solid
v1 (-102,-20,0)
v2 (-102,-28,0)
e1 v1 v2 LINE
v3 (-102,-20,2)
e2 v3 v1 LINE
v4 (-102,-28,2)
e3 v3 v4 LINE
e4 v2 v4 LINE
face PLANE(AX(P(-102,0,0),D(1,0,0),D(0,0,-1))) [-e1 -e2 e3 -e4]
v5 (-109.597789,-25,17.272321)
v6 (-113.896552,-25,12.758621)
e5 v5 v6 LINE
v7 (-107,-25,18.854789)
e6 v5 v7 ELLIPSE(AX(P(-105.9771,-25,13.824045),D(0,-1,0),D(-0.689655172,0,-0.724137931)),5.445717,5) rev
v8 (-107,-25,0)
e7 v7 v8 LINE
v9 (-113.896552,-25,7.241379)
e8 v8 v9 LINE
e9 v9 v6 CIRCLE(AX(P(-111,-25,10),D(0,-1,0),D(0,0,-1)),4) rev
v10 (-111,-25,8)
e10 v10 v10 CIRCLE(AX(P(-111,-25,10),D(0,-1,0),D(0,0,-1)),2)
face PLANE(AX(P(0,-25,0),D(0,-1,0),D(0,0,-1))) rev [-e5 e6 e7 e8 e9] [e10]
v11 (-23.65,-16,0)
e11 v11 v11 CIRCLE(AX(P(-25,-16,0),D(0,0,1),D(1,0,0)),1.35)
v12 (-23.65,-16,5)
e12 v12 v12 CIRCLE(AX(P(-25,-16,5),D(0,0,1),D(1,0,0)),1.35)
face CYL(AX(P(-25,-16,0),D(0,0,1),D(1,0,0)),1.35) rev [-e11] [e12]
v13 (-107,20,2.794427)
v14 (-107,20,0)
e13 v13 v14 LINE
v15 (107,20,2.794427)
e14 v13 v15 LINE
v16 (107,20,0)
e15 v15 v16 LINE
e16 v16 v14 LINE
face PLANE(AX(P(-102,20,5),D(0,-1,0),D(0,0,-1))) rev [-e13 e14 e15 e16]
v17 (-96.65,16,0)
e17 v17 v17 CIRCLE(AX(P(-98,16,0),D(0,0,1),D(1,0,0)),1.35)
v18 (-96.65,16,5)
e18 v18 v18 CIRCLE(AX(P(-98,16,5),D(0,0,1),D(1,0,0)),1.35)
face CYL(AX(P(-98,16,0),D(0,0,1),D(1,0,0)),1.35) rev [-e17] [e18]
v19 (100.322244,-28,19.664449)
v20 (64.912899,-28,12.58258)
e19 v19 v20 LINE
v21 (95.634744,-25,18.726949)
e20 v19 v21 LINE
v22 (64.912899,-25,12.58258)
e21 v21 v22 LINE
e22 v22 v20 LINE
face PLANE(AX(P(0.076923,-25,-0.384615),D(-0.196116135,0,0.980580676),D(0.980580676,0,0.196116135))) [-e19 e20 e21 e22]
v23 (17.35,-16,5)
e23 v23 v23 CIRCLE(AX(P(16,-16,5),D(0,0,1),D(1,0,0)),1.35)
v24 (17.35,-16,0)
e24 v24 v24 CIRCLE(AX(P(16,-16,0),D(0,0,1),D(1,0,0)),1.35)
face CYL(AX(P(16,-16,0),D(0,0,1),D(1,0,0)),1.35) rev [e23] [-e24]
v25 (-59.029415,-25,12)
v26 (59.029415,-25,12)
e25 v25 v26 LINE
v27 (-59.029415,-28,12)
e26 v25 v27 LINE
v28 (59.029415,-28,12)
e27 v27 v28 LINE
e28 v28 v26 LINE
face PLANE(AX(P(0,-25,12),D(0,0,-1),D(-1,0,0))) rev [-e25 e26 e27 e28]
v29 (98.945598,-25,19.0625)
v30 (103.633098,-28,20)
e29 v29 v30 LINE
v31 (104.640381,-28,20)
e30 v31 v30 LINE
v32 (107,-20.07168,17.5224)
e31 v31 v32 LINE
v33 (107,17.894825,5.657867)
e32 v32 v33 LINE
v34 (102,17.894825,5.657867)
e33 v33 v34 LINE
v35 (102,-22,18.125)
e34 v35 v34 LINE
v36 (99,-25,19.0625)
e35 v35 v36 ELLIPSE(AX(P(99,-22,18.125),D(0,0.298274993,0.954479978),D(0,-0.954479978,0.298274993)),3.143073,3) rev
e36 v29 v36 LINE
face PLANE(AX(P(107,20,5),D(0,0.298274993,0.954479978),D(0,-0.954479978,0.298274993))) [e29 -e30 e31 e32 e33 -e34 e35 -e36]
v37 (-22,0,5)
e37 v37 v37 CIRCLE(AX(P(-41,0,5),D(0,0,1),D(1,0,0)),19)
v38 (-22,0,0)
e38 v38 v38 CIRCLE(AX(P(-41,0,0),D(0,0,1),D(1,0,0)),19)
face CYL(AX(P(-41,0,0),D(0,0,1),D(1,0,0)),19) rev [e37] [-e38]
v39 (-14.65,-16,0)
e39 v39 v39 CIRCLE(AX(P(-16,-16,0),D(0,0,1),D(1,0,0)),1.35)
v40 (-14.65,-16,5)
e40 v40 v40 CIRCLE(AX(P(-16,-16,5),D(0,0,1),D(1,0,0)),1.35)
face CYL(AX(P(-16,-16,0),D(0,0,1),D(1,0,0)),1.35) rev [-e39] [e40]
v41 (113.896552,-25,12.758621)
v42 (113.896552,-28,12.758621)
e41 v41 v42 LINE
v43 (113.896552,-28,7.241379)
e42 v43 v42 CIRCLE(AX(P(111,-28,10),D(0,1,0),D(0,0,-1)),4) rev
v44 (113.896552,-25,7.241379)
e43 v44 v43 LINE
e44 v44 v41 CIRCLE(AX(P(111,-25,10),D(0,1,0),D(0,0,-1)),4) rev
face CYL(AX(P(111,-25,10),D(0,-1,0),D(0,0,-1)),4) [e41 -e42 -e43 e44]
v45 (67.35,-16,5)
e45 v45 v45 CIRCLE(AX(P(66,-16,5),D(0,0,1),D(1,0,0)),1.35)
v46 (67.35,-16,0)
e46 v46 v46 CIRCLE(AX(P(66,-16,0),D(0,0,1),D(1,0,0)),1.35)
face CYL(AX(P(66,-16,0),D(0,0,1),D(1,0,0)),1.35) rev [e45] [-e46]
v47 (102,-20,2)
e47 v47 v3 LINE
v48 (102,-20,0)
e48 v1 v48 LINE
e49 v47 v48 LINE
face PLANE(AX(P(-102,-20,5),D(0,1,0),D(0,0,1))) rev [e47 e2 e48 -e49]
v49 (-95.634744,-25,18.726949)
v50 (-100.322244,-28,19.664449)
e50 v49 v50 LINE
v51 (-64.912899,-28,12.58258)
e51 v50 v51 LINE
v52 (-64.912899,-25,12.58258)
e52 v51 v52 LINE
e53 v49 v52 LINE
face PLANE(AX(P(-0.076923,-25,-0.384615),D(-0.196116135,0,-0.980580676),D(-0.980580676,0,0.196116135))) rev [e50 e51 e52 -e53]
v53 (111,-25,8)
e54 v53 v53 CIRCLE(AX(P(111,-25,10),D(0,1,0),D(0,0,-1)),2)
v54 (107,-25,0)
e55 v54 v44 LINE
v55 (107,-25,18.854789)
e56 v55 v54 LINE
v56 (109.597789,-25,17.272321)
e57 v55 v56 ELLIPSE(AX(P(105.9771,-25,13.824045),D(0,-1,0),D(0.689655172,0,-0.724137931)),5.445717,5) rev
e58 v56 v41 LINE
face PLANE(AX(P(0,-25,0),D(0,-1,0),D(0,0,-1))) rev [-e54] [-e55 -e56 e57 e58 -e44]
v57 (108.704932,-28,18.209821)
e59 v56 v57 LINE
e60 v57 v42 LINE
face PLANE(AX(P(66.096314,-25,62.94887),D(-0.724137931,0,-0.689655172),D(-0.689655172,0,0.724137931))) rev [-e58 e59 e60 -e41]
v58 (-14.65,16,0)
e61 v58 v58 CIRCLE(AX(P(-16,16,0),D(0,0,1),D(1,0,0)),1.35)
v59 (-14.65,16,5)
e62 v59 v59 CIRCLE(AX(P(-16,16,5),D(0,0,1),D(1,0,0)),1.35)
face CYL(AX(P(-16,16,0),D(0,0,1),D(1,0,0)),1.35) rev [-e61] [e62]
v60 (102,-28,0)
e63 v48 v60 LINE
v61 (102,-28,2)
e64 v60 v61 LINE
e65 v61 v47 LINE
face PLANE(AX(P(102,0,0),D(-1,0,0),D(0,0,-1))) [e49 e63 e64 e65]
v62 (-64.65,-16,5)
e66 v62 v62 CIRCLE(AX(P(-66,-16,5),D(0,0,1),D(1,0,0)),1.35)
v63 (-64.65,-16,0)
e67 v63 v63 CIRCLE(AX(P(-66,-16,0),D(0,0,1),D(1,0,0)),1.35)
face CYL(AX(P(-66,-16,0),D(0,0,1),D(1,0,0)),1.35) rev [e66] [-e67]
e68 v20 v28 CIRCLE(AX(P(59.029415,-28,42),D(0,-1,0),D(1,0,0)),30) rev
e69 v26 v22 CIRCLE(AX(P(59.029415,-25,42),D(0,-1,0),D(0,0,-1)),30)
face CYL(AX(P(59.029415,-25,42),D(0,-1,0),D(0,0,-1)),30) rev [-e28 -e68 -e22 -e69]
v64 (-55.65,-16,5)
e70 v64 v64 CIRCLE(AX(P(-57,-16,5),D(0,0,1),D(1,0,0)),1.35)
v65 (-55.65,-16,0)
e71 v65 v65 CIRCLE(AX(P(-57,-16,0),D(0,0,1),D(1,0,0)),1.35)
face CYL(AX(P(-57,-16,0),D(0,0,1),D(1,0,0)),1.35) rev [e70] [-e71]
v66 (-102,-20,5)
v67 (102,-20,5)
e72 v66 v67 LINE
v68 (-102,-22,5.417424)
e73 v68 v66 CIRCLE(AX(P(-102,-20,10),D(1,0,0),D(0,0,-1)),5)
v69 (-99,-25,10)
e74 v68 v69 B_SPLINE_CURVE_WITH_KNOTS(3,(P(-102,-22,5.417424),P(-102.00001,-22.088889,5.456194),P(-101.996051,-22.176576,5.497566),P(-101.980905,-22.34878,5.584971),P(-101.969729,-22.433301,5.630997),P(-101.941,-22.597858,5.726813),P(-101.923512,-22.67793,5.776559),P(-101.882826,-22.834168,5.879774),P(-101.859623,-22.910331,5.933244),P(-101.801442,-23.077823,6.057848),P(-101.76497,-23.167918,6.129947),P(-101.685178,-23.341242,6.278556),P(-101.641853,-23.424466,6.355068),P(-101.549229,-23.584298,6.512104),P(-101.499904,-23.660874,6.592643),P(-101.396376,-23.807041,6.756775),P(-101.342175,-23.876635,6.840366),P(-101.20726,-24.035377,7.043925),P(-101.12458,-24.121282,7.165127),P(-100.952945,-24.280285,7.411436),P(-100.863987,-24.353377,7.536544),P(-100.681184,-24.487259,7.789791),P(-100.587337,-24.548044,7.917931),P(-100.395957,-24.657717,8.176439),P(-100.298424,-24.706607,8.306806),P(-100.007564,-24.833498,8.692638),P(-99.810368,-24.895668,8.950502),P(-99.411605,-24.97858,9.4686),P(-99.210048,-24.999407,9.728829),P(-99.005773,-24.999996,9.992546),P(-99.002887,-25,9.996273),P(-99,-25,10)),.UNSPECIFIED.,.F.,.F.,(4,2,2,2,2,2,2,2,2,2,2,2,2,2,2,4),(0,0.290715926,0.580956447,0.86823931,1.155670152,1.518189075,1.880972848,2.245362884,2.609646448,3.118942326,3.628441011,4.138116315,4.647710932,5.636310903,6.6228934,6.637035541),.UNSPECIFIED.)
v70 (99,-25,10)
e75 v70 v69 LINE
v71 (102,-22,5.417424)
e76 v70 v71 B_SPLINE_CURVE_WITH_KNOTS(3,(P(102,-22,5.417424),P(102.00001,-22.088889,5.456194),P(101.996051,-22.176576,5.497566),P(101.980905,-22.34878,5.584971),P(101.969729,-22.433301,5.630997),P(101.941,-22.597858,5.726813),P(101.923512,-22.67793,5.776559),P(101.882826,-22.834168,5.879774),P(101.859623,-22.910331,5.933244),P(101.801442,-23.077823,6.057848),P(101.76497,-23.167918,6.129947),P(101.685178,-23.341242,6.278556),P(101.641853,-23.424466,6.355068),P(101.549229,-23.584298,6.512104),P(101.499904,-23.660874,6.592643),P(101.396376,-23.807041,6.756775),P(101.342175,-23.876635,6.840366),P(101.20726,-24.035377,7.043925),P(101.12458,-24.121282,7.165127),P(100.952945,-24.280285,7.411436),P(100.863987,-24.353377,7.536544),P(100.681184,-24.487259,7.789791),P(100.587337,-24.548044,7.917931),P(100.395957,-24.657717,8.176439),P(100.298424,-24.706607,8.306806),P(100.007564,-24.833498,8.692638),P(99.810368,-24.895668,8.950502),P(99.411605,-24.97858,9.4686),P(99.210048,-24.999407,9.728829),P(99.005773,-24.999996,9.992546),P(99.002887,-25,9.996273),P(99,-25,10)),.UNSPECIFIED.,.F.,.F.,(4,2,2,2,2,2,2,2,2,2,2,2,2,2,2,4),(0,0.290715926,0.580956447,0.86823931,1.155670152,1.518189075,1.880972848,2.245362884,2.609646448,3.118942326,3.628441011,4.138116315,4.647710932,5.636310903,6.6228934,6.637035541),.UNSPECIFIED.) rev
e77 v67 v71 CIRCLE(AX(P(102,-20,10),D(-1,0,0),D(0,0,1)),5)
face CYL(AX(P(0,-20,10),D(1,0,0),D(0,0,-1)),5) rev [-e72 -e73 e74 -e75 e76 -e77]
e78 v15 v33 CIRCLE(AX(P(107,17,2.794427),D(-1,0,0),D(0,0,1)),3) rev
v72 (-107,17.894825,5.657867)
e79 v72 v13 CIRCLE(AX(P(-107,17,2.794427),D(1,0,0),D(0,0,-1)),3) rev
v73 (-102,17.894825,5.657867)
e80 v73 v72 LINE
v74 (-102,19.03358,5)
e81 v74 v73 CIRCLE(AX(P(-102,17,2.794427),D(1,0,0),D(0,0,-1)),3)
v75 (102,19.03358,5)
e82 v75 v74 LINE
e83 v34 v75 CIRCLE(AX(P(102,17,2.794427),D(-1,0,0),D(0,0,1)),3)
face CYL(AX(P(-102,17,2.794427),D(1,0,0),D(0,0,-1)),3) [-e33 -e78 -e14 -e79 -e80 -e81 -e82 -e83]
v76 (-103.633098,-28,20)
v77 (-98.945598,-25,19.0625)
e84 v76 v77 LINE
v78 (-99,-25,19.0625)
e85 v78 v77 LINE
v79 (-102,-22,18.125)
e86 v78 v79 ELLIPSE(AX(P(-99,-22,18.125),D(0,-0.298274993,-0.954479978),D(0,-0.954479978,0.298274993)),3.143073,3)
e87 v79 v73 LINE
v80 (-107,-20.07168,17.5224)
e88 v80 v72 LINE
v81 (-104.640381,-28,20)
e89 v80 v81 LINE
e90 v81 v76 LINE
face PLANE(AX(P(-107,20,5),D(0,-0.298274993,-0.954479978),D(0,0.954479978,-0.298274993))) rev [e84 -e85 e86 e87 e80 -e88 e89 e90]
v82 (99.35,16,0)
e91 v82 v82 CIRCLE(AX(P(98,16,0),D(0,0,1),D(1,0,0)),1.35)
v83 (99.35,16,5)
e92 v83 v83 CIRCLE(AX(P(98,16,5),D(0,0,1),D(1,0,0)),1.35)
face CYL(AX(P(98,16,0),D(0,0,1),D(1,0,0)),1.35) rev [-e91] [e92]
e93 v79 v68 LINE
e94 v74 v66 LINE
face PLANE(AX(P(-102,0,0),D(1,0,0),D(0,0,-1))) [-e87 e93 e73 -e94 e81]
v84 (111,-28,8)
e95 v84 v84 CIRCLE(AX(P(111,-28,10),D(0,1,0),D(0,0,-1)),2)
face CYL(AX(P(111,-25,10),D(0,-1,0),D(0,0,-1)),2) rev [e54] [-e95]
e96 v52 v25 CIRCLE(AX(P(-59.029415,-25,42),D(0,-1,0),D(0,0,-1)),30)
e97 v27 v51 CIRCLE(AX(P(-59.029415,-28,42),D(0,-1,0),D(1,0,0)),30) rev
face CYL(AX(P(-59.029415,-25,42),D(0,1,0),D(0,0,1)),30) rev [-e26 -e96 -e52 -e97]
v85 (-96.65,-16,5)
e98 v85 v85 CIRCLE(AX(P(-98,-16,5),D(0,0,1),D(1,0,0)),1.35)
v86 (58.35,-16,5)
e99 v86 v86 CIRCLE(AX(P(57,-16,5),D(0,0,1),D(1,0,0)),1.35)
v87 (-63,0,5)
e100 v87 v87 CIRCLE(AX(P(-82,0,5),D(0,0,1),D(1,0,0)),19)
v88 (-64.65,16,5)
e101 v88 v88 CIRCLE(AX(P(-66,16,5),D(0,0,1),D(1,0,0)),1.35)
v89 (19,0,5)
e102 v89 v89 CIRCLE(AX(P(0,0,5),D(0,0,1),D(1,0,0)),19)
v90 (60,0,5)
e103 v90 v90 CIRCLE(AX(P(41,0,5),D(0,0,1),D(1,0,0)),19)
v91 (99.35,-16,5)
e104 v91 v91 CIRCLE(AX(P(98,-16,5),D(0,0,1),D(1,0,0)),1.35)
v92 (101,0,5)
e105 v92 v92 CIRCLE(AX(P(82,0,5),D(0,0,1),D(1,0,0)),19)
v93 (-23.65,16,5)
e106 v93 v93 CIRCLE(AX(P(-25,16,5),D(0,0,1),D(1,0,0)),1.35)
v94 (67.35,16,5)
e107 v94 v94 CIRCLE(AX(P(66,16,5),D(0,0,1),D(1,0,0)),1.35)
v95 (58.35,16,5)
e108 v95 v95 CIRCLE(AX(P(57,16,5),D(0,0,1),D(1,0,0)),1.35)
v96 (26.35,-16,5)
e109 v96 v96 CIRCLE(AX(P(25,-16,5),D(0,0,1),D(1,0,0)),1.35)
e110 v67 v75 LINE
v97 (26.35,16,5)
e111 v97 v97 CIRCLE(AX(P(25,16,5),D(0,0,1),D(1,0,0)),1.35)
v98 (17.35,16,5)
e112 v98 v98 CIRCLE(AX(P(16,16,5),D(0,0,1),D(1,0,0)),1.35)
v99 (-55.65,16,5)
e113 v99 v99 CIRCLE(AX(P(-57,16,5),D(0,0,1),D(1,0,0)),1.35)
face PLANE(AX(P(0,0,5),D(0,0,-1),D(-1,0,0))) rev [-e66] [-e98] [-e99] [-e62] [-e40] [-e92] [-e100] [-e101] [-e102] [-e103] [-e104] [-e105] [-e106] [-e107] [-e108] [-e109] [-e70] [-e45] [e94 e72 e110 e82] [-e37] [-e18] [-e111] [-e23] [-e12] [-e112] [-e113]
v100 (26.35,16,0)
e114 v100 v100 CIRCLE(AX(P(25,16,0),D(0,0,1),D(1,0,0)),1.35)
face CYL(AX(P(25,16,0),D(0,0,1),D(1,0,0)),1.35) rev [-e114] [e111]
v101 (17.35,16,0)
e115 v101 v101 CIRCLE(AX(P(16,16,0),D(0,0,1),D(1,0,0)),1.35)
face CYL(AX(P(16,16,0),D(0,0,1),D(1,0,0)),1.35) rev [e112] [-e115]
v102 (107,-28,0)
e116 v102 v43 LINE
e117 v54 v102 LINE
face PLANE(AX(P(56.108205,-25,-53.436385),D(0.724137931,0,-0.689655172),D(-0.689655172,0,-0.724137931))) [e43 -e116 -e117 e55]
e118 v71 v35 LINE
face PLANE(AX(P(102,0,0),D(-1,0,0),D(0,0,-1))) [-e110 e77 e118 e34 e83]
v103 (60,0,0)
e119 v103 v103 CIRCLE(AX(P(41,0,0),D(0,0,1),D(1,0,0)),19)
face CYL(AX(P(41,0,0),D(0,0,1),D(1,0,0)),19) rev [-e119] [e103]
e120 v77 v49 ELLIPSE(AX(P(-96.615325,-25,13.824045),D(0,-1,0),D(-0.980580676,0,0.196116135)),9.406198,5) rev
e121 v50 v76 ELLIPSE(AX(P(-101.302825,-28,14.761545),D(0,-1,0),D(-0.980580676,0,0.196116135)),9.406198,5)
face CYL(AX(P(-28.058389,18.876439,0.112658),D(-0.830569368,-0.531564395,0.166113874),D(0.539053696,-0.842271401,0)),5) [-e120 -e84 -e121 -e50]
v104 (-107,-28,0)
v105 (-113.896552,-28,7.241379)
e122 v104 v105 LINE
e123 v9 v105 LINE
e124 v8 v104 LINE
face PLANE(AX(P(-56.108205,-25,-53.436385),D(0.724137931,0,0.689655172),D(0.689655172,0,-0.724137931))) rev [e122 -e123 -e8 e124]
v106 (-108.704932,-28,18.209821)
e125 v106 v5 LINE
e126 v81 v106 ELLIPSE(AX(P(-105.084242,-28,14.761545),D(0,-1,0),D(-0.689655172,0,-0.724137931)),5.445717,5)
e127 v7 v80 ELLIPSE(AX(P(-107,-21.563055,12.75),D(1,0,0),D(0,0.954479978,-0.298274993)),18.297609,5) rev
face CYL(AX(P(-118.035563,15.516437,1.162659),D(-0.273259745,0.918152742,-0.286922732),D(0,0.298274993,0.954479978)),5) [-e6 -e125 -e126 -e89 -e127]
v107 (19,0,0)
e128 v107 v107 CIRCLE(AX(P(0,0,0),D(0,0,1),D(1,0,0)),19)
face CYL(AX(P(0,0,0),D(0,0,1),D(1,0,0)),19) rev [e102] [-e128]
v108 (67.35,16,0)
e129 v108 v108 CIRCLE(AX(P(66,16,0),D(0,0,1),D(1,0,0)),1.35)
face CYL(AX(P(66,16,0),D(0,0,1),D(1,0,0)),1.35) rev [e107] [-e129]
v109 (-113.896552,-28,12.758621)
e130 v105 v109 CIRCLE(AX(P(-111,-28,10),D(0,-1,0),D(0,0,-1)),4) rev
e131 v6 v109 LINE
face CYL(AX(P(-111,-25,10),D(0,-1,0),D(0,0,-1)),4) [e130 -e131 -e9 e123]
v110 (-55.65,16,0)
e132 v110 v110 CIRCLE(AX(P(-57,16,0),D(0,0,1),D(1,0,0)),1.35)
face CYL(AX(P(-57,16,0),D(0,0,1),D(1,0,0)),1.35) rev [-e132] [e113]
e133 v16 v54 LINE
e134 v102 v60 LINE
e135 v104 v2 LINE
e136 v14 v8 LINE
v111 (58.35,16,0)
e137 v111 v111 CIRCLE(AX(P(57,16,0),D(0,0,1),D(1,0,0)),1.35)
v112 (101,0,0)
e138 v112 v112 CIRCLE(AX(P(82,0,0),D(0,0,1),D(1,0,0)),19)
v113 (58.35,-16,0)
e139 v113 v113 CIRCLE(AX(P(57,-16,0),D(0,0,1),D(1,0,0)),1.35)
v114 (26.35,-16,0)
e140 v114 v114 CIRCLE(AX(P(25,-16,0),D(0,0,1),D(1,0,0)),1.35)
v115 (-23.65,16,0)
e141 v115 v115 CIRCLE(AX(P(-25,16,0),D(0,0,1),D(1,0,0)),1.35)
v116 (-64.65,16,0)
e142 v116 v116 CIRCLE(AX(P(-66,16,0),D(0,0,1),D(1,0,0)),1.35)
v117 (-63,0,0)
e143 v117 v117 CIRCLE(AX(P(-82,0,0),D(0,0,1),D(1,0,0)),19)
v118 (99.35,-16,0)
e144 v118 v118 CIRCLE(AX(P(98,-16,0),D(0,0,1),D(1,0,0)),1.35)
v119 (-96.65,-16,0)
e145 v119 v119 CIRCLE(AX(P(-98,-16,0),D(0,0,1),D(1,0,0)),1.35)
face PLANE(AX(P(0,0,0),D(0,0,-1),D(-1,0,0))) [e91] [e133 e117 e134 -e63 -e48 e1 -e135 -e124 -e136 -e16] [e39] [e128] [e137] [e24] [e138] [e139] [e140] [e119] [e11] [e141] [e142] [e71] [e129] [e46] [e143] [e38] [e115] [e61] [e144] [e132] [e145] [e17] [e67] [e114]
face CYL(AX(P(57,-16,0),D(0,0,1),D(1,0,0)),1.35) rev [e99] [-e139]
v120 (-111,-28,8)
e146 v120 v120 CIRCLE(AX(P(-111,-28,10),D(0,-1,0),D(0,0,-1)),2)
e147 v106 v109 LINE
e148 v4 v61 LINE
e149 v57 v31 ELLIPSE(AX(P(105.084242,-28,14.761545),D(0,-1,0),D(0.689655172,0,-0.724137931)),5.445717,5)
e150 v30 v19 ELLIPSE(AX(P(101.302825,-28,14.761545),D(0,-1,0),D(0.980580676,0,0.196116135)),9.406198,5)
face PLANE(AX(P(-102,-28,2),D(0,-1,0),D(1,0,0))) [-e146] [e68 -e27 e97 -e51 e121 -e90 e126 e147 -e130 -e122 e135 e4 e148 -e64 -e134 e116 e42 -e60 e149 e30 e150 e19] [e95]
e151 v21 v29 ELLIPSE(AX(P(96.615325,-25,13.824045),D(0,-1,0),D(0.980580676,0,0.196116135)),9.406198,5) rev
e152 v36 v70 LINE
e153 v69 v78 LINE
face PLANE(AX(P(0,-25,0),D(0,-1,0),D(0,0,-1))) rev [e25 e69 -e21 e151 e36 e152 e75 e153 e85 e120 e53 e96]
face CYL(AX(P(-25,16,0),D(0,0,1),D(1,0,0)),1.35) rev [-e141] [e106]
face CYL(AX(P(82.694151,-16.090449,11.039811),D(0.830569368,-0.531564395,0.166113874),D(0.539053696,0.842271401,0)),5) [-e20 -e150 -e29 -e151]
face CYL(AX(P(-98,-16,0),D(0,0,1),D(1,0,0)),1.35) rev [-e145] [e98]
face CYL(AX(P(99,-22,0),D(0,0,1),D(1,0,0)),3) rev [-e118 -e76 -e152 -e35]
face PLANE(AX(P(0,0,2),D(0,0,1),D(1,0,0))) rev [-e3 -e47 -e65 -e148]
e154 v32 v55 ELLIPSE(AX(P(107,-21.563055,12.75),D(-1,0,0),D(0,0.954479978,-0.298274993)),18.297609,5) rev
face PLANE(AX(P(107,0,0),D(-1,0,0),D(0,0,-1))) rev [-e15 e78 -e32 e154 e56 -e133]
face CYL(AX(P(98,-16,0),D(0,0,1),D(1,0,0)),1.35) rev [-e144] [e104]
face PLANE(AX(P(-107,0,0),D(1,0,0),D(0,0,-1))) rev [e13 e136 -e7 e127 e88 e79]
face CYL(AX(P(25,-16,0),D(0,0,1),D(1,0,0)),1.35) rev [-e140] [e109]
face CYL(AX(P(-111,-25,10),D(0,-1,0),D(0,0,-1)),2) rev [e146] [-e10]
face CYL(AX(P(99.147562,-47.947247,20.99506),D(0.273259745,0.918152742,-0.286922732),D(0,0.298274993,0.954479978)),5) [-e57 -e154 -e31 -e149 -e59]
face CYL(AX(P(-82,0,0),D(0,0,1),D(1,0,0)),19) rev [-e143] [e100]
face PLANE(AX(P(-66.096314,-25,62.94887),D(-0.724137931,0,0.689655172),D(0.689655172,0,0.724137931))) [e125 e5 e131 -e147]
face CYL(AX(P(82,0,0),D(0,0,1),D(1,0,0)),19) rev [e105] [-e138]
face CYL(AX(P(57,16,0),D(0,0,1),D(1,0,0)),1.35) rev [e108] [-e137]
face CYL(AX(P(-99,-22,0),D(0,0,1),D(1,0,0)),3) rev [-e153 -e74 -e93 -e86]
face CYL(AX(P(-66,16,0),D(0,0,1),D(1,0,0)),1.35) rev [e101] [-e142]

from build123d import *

# Parameters (mm, degrees)
SKETCH1_W               = 204
SKETCH1_H               = 40
BOSS_EXTRUDE1_DEPTH     = 5
SKETCH3_R               = 1.3500000000000054
SKETCH3_R_2             = 19.000000000000004
SKETCH3_R_3             = 1.349999999999999
SKETCH3_R_4             = 1.3499999999999983
SKETCH3_R_5             = 19
SKETCH3_R_6             = 1.3500000000000005
SKETCH3_R_7             = 1.3500000000000059
SKETCH3_R_8             = 1.3499999999999912
CUT_EXTRUDE1_DEPTH      = 105.06248123122955
BOSS_EXTRUDE2_DEPTH     = 3
BOSS_EXTRUDE3_DEPTH     = 5
SKETCH7_R               = 1.9999999999999962
BOSS_EXTRUDE4_DEPTH     = 3
CUT_EXTRUDE2_DEPTH      = 225.65084019428903
CUT_EXTRUDE2_DEPTH_BACK = 225.65084019428903
FILLET1_R               = 30
FILLET3_R               = 5
FILLET4_START           = 5.417424205
FILLET4_DEPTH           = 12.00765993
FILLET4_START_2         = 17.425084135
FILLET4_2_DEPTH         = 1.637415965
FILLET4_START_3         = -108
FILLET4_3_DEPTH         = 216


with BuildPart() as part:
    # Sketch1 → Boss-Extrude1 (new body)
    with BuildSketch(Plane.XY):
        Rectangle(SKETCH1_W, SKETCH1_H)
    extrude(amount=BOSS_EXTRUDE1_DEPTH)

    # Sketch3 → Cut-Extrude1 (cut, through all)
    with BuildSketch(Plane.XY.offset(5)):
        with Locations((-97.99999999999997, 15.999999999999996)):
            Circle(SKETCH3_R)
        with Locations((-66, 16.000000000000004)):
            Circle(SKETCH3_R)
        with Locations((-66, -15.999999999999977)):
            Circle(SKETCH3_R)
        with Locations((-97.99999999999997, -16.000000000000004)):
            Circle(SKETCH3_R)
        with Locations((-81.99999999999997, -3.47e-15)):
            Circle(SKETCH3_R_2)
        with Locations((-56.99999999999997, 15.999999999999996)):
            Circle(SKETCH3_R_3)
        with Locations((-25, 16.000000000000004)):
            Circle(SKETCH3_R_3)
        with Locations((-25, -15.999999999999977)):
            Circle(SKETCH3_R_4)
        with Locations((-56.99999999999997, -16.000000000000004)):
            Circle(SKETCH3_R_4)
        with Locations((-40.99999999999997, -3.47e-15)):
            Circle(SKETCH3_R_5)
        with Locations((-15.999999999999973, 15.999999999999996)):
            Circle(SKETCH3_R_3)
        with Locations((16, 16.000000000000004)):
            Circle(SKETCH3_R_3)
        with Locations((16, -15.999999999999977)):
            Circle(SKETCH3_R_4)
        with Locations((-15.999999999999973, -16.000000000000004)):
            Circle(SKETCH3_R_6)
        Circle(SKETCH3_R_2)
        with Locations((25.00000000000002, 15.999999999999996)):
            Circle(SKETCH3_R)
        with Locations((56.99999999999999, 16.000000000000004)):
            Circle(SKETCH3_R_3)
        with Locations((56.99999999999999, -15.999999999999977)):
            Circle(SKETCH3_R)
        with Locations((25.00000000000002, -16.000000000000004)):
            Circle(SKETCH3_R_7)
        with Locations((41.00000000000002, -3.47e-15)):
            Circle(SKETCH3_R_2)
        with Locations((66.00000000000003, 15.999999999999996)):
            Circle(SKETCH3_R)
        with Locations((98, 16.000000000000004)):
            Circle(SKETCH3_R_8)
        with Locations((98, -15.999999999999977)):
            Circle(SKETCH3_R)
        with Locations((66.00000000000003, -16.000000000000004)):
            Circle(SKETCH3_R)
        with Locations((82.00000000000003, -3.47e-15)):
            Circle(SKETCH3_R_2)
    extrude(amount=-CUT_EXTRUDE1_DEPTH, mode=Mode.SUBTRACT)

    # Sketch5 → Boss-Extrude2 (add)
    with BuildSketch(Plane.XY.offset(5)):
        Polygon((-101.99999999999999, -20), (102.00000000000001, -20), (102.00000000000001, -28), (-101.99999999999999, -27.999999999999996), align=None)
    extrude(amount=-BOSS_EXTRUDE2_DEPTH)

    # Sketch6 → Boss-Extrude3 (add)
    with BuildSketch(Plane.ZY.offset(101.99999999999999)):
        Polygon((0, 20), (5, 20), (20, -27.999999999999996), (0, -28), align=None)
    boss_extrude3 = extrude(amount=BOSS_EXTRUDE3_DEPTH)

    # Sketch7 → Boss-Extrude4 (add)
    # profile 1 of 2: a face of its own
    with BuildSketch(Plane.XZ.offset(27.999999999999996)):
        with BuildLine():
            ThreePointArc((-113.89655172413792, 7.241379310344828), (-114.99999999999999, 10.000000000000002), (-113.89655172413792, 12.758620689655173))
            Line((-113.89655172413792, 12.758620689655173), (-106.99999999999999, 20))
            Line((-106.99999999999999, 20), (-106.99999999999999, 0))
            Line((-106.99999999999999, 0), (-113.89655172413792, 7.241379310344828))
        make_face()
        with Locations(Location((-110.99999999999999, 10, 0), (0, 0, 270))):
            Circle(SKETCH7_R, mode=Mode.SUBTRACT)
    # profile 2 of 2: a face of its own
    with BuildSketch(Plane.XZ.offset(27.999999999999996)):
        Polygon((-61.99999999999998, 12.000000000000012), (-101.99999999999999, 20), (-101.99999999999999, 5), (0, 5.0000000000000195), (-8.6e-16, 12.00000000000001), align=None)
    boss_extrude4 = extrude(amount=-BOSS_EXTRUDE4_DEPTH)

    # Mirror1: Boss-Extrude3, Boss-Extrude4 across plane
    add(boss_extrude3.mirror(Plane(origin=(0, 0, 0), x_dir=(0, 0, 1), z_dir=(1, 0, 0))))
    add(boss_extrude4.mirror(Plane(origin=(0, 0, 0), x_dir=(0, 0, 1), z_dir=(1, 0, 0))))

    # Sketch8 → Cut-Extrude2 (cut, two sides: drawn at the far end of the back side and taken through both)
    with BuildSketch(Plane(origin=(-106.99999999999999, 0, 0), x_dir=(0, 0, -1), z_dir=(1, 0, 0)).offset(-CUT_EXTRUDE2_DEPTH_BACK)):
        Polygon((-20, -27.999999999999996), (-18.47924649389312, -23.133588780457977), (-22.698909266978262, -25.783585861034908), align=None)
    extrude(amount=CUT_EXTRUDE2_DEPTH + CUT_EXTRUDE2_DEPTH_BACK, mode=Mode.SUBTRACT)

    # Fillet1
    fillet1_edges = [part.edges().sort_by_distance(p)[0] for p in [
        (-61.99999999999998, -26.499999999999996, 12.000000000000012),
        (61.99999999999998, -26.499999999999996, 12.000000000000012),
    ]]
    fillet(fillet1_edges, radius=FILLET1_R)

    # Fillet3
    fillet3_edges = [part.edges().sort_by_distance(p)[0] for p in [
        (0, -24.999999999999996, 5),
        (99.65624999999999, -26.499999999999993, 19.53125),
        (-99.65624999999999, -26.499999999999996, 19.53125),
        (-107.44642857142854, -26.499999999999996, 19.53125),
        (107.44642857142858, -26.499999999999996, 19.531250000000004),
    ]]
    fillet(fillet3_edges, radius=FILLET3_R)

    # Fillet4: read off the stored shape, not the designer's step
    # Fillet4 outline → Fillet4 (add)
    with BuildSketch(Plane.XY.offset(FILLET4_START)):
        with BuildLine():
            ThreePointArc((-99, -25), (-101.121320344, -24.121320344), (-102, -22))
            Line((-102, -22), (-102, -25))
            Line((-102, -25), (-99, -25))
        make_face()
        with BuildLine():
            ThreePointArc((102, -22), (101.121320344, -24.121320344), (99, -25))
            Line((99, -25), (102, -25))
            Line((102, -25), (102, -22))
        make_face()
    extrude(amount=FILLET4_DEPTH)

    # Fillet4 2 outline → Fillet4 2 (add)
    with BuildSketch(Plane.XY.offset(FILLET4_START_2)):
        with BuildLine():
            ThreePointArc((-99, -25), (-101.121320344, -24.121320344), (-102, -22))
            Line((-102, -22), (-102, -25))
            Line((-102, -25), (-99, -25))
        make_face()
        with BuildLine():
            ThreePointArc((102, -22), (101.121320344, -24.121320344), (99, -25))
            Line((99, -25), (102, -25))
            Line((102, -25), (102, -22))
        make_face()
    extrude(amount=FILLET4_2_DEPTH)

    # Fillet4 3 outline → Fillet4 3 (cut)
    with BuildSketch(Plane.YZ.offset(FILLET4_START_3)):
        with BuildLine():
            ThreePointArc((17.894824979, 5.657867194), (19.417072086, 4.571436695), (20, 2.79442726))
            Line((20, 2.79442726), (20, 21))
            Line((20, 21), (-27, 21))
            Line((-27, 21), (-27, 19.687500007))
            Line((-27, 19.687500007), (-25.000000027, 19.062500015))
            Line((-25.000000027, 19.062500015), (17.894824979, 5.657867194))
        make_face()
    extrude(amount=FILLET4_3_DEPTH, mode=Mode.SUBTRACT)


solid = part.part
